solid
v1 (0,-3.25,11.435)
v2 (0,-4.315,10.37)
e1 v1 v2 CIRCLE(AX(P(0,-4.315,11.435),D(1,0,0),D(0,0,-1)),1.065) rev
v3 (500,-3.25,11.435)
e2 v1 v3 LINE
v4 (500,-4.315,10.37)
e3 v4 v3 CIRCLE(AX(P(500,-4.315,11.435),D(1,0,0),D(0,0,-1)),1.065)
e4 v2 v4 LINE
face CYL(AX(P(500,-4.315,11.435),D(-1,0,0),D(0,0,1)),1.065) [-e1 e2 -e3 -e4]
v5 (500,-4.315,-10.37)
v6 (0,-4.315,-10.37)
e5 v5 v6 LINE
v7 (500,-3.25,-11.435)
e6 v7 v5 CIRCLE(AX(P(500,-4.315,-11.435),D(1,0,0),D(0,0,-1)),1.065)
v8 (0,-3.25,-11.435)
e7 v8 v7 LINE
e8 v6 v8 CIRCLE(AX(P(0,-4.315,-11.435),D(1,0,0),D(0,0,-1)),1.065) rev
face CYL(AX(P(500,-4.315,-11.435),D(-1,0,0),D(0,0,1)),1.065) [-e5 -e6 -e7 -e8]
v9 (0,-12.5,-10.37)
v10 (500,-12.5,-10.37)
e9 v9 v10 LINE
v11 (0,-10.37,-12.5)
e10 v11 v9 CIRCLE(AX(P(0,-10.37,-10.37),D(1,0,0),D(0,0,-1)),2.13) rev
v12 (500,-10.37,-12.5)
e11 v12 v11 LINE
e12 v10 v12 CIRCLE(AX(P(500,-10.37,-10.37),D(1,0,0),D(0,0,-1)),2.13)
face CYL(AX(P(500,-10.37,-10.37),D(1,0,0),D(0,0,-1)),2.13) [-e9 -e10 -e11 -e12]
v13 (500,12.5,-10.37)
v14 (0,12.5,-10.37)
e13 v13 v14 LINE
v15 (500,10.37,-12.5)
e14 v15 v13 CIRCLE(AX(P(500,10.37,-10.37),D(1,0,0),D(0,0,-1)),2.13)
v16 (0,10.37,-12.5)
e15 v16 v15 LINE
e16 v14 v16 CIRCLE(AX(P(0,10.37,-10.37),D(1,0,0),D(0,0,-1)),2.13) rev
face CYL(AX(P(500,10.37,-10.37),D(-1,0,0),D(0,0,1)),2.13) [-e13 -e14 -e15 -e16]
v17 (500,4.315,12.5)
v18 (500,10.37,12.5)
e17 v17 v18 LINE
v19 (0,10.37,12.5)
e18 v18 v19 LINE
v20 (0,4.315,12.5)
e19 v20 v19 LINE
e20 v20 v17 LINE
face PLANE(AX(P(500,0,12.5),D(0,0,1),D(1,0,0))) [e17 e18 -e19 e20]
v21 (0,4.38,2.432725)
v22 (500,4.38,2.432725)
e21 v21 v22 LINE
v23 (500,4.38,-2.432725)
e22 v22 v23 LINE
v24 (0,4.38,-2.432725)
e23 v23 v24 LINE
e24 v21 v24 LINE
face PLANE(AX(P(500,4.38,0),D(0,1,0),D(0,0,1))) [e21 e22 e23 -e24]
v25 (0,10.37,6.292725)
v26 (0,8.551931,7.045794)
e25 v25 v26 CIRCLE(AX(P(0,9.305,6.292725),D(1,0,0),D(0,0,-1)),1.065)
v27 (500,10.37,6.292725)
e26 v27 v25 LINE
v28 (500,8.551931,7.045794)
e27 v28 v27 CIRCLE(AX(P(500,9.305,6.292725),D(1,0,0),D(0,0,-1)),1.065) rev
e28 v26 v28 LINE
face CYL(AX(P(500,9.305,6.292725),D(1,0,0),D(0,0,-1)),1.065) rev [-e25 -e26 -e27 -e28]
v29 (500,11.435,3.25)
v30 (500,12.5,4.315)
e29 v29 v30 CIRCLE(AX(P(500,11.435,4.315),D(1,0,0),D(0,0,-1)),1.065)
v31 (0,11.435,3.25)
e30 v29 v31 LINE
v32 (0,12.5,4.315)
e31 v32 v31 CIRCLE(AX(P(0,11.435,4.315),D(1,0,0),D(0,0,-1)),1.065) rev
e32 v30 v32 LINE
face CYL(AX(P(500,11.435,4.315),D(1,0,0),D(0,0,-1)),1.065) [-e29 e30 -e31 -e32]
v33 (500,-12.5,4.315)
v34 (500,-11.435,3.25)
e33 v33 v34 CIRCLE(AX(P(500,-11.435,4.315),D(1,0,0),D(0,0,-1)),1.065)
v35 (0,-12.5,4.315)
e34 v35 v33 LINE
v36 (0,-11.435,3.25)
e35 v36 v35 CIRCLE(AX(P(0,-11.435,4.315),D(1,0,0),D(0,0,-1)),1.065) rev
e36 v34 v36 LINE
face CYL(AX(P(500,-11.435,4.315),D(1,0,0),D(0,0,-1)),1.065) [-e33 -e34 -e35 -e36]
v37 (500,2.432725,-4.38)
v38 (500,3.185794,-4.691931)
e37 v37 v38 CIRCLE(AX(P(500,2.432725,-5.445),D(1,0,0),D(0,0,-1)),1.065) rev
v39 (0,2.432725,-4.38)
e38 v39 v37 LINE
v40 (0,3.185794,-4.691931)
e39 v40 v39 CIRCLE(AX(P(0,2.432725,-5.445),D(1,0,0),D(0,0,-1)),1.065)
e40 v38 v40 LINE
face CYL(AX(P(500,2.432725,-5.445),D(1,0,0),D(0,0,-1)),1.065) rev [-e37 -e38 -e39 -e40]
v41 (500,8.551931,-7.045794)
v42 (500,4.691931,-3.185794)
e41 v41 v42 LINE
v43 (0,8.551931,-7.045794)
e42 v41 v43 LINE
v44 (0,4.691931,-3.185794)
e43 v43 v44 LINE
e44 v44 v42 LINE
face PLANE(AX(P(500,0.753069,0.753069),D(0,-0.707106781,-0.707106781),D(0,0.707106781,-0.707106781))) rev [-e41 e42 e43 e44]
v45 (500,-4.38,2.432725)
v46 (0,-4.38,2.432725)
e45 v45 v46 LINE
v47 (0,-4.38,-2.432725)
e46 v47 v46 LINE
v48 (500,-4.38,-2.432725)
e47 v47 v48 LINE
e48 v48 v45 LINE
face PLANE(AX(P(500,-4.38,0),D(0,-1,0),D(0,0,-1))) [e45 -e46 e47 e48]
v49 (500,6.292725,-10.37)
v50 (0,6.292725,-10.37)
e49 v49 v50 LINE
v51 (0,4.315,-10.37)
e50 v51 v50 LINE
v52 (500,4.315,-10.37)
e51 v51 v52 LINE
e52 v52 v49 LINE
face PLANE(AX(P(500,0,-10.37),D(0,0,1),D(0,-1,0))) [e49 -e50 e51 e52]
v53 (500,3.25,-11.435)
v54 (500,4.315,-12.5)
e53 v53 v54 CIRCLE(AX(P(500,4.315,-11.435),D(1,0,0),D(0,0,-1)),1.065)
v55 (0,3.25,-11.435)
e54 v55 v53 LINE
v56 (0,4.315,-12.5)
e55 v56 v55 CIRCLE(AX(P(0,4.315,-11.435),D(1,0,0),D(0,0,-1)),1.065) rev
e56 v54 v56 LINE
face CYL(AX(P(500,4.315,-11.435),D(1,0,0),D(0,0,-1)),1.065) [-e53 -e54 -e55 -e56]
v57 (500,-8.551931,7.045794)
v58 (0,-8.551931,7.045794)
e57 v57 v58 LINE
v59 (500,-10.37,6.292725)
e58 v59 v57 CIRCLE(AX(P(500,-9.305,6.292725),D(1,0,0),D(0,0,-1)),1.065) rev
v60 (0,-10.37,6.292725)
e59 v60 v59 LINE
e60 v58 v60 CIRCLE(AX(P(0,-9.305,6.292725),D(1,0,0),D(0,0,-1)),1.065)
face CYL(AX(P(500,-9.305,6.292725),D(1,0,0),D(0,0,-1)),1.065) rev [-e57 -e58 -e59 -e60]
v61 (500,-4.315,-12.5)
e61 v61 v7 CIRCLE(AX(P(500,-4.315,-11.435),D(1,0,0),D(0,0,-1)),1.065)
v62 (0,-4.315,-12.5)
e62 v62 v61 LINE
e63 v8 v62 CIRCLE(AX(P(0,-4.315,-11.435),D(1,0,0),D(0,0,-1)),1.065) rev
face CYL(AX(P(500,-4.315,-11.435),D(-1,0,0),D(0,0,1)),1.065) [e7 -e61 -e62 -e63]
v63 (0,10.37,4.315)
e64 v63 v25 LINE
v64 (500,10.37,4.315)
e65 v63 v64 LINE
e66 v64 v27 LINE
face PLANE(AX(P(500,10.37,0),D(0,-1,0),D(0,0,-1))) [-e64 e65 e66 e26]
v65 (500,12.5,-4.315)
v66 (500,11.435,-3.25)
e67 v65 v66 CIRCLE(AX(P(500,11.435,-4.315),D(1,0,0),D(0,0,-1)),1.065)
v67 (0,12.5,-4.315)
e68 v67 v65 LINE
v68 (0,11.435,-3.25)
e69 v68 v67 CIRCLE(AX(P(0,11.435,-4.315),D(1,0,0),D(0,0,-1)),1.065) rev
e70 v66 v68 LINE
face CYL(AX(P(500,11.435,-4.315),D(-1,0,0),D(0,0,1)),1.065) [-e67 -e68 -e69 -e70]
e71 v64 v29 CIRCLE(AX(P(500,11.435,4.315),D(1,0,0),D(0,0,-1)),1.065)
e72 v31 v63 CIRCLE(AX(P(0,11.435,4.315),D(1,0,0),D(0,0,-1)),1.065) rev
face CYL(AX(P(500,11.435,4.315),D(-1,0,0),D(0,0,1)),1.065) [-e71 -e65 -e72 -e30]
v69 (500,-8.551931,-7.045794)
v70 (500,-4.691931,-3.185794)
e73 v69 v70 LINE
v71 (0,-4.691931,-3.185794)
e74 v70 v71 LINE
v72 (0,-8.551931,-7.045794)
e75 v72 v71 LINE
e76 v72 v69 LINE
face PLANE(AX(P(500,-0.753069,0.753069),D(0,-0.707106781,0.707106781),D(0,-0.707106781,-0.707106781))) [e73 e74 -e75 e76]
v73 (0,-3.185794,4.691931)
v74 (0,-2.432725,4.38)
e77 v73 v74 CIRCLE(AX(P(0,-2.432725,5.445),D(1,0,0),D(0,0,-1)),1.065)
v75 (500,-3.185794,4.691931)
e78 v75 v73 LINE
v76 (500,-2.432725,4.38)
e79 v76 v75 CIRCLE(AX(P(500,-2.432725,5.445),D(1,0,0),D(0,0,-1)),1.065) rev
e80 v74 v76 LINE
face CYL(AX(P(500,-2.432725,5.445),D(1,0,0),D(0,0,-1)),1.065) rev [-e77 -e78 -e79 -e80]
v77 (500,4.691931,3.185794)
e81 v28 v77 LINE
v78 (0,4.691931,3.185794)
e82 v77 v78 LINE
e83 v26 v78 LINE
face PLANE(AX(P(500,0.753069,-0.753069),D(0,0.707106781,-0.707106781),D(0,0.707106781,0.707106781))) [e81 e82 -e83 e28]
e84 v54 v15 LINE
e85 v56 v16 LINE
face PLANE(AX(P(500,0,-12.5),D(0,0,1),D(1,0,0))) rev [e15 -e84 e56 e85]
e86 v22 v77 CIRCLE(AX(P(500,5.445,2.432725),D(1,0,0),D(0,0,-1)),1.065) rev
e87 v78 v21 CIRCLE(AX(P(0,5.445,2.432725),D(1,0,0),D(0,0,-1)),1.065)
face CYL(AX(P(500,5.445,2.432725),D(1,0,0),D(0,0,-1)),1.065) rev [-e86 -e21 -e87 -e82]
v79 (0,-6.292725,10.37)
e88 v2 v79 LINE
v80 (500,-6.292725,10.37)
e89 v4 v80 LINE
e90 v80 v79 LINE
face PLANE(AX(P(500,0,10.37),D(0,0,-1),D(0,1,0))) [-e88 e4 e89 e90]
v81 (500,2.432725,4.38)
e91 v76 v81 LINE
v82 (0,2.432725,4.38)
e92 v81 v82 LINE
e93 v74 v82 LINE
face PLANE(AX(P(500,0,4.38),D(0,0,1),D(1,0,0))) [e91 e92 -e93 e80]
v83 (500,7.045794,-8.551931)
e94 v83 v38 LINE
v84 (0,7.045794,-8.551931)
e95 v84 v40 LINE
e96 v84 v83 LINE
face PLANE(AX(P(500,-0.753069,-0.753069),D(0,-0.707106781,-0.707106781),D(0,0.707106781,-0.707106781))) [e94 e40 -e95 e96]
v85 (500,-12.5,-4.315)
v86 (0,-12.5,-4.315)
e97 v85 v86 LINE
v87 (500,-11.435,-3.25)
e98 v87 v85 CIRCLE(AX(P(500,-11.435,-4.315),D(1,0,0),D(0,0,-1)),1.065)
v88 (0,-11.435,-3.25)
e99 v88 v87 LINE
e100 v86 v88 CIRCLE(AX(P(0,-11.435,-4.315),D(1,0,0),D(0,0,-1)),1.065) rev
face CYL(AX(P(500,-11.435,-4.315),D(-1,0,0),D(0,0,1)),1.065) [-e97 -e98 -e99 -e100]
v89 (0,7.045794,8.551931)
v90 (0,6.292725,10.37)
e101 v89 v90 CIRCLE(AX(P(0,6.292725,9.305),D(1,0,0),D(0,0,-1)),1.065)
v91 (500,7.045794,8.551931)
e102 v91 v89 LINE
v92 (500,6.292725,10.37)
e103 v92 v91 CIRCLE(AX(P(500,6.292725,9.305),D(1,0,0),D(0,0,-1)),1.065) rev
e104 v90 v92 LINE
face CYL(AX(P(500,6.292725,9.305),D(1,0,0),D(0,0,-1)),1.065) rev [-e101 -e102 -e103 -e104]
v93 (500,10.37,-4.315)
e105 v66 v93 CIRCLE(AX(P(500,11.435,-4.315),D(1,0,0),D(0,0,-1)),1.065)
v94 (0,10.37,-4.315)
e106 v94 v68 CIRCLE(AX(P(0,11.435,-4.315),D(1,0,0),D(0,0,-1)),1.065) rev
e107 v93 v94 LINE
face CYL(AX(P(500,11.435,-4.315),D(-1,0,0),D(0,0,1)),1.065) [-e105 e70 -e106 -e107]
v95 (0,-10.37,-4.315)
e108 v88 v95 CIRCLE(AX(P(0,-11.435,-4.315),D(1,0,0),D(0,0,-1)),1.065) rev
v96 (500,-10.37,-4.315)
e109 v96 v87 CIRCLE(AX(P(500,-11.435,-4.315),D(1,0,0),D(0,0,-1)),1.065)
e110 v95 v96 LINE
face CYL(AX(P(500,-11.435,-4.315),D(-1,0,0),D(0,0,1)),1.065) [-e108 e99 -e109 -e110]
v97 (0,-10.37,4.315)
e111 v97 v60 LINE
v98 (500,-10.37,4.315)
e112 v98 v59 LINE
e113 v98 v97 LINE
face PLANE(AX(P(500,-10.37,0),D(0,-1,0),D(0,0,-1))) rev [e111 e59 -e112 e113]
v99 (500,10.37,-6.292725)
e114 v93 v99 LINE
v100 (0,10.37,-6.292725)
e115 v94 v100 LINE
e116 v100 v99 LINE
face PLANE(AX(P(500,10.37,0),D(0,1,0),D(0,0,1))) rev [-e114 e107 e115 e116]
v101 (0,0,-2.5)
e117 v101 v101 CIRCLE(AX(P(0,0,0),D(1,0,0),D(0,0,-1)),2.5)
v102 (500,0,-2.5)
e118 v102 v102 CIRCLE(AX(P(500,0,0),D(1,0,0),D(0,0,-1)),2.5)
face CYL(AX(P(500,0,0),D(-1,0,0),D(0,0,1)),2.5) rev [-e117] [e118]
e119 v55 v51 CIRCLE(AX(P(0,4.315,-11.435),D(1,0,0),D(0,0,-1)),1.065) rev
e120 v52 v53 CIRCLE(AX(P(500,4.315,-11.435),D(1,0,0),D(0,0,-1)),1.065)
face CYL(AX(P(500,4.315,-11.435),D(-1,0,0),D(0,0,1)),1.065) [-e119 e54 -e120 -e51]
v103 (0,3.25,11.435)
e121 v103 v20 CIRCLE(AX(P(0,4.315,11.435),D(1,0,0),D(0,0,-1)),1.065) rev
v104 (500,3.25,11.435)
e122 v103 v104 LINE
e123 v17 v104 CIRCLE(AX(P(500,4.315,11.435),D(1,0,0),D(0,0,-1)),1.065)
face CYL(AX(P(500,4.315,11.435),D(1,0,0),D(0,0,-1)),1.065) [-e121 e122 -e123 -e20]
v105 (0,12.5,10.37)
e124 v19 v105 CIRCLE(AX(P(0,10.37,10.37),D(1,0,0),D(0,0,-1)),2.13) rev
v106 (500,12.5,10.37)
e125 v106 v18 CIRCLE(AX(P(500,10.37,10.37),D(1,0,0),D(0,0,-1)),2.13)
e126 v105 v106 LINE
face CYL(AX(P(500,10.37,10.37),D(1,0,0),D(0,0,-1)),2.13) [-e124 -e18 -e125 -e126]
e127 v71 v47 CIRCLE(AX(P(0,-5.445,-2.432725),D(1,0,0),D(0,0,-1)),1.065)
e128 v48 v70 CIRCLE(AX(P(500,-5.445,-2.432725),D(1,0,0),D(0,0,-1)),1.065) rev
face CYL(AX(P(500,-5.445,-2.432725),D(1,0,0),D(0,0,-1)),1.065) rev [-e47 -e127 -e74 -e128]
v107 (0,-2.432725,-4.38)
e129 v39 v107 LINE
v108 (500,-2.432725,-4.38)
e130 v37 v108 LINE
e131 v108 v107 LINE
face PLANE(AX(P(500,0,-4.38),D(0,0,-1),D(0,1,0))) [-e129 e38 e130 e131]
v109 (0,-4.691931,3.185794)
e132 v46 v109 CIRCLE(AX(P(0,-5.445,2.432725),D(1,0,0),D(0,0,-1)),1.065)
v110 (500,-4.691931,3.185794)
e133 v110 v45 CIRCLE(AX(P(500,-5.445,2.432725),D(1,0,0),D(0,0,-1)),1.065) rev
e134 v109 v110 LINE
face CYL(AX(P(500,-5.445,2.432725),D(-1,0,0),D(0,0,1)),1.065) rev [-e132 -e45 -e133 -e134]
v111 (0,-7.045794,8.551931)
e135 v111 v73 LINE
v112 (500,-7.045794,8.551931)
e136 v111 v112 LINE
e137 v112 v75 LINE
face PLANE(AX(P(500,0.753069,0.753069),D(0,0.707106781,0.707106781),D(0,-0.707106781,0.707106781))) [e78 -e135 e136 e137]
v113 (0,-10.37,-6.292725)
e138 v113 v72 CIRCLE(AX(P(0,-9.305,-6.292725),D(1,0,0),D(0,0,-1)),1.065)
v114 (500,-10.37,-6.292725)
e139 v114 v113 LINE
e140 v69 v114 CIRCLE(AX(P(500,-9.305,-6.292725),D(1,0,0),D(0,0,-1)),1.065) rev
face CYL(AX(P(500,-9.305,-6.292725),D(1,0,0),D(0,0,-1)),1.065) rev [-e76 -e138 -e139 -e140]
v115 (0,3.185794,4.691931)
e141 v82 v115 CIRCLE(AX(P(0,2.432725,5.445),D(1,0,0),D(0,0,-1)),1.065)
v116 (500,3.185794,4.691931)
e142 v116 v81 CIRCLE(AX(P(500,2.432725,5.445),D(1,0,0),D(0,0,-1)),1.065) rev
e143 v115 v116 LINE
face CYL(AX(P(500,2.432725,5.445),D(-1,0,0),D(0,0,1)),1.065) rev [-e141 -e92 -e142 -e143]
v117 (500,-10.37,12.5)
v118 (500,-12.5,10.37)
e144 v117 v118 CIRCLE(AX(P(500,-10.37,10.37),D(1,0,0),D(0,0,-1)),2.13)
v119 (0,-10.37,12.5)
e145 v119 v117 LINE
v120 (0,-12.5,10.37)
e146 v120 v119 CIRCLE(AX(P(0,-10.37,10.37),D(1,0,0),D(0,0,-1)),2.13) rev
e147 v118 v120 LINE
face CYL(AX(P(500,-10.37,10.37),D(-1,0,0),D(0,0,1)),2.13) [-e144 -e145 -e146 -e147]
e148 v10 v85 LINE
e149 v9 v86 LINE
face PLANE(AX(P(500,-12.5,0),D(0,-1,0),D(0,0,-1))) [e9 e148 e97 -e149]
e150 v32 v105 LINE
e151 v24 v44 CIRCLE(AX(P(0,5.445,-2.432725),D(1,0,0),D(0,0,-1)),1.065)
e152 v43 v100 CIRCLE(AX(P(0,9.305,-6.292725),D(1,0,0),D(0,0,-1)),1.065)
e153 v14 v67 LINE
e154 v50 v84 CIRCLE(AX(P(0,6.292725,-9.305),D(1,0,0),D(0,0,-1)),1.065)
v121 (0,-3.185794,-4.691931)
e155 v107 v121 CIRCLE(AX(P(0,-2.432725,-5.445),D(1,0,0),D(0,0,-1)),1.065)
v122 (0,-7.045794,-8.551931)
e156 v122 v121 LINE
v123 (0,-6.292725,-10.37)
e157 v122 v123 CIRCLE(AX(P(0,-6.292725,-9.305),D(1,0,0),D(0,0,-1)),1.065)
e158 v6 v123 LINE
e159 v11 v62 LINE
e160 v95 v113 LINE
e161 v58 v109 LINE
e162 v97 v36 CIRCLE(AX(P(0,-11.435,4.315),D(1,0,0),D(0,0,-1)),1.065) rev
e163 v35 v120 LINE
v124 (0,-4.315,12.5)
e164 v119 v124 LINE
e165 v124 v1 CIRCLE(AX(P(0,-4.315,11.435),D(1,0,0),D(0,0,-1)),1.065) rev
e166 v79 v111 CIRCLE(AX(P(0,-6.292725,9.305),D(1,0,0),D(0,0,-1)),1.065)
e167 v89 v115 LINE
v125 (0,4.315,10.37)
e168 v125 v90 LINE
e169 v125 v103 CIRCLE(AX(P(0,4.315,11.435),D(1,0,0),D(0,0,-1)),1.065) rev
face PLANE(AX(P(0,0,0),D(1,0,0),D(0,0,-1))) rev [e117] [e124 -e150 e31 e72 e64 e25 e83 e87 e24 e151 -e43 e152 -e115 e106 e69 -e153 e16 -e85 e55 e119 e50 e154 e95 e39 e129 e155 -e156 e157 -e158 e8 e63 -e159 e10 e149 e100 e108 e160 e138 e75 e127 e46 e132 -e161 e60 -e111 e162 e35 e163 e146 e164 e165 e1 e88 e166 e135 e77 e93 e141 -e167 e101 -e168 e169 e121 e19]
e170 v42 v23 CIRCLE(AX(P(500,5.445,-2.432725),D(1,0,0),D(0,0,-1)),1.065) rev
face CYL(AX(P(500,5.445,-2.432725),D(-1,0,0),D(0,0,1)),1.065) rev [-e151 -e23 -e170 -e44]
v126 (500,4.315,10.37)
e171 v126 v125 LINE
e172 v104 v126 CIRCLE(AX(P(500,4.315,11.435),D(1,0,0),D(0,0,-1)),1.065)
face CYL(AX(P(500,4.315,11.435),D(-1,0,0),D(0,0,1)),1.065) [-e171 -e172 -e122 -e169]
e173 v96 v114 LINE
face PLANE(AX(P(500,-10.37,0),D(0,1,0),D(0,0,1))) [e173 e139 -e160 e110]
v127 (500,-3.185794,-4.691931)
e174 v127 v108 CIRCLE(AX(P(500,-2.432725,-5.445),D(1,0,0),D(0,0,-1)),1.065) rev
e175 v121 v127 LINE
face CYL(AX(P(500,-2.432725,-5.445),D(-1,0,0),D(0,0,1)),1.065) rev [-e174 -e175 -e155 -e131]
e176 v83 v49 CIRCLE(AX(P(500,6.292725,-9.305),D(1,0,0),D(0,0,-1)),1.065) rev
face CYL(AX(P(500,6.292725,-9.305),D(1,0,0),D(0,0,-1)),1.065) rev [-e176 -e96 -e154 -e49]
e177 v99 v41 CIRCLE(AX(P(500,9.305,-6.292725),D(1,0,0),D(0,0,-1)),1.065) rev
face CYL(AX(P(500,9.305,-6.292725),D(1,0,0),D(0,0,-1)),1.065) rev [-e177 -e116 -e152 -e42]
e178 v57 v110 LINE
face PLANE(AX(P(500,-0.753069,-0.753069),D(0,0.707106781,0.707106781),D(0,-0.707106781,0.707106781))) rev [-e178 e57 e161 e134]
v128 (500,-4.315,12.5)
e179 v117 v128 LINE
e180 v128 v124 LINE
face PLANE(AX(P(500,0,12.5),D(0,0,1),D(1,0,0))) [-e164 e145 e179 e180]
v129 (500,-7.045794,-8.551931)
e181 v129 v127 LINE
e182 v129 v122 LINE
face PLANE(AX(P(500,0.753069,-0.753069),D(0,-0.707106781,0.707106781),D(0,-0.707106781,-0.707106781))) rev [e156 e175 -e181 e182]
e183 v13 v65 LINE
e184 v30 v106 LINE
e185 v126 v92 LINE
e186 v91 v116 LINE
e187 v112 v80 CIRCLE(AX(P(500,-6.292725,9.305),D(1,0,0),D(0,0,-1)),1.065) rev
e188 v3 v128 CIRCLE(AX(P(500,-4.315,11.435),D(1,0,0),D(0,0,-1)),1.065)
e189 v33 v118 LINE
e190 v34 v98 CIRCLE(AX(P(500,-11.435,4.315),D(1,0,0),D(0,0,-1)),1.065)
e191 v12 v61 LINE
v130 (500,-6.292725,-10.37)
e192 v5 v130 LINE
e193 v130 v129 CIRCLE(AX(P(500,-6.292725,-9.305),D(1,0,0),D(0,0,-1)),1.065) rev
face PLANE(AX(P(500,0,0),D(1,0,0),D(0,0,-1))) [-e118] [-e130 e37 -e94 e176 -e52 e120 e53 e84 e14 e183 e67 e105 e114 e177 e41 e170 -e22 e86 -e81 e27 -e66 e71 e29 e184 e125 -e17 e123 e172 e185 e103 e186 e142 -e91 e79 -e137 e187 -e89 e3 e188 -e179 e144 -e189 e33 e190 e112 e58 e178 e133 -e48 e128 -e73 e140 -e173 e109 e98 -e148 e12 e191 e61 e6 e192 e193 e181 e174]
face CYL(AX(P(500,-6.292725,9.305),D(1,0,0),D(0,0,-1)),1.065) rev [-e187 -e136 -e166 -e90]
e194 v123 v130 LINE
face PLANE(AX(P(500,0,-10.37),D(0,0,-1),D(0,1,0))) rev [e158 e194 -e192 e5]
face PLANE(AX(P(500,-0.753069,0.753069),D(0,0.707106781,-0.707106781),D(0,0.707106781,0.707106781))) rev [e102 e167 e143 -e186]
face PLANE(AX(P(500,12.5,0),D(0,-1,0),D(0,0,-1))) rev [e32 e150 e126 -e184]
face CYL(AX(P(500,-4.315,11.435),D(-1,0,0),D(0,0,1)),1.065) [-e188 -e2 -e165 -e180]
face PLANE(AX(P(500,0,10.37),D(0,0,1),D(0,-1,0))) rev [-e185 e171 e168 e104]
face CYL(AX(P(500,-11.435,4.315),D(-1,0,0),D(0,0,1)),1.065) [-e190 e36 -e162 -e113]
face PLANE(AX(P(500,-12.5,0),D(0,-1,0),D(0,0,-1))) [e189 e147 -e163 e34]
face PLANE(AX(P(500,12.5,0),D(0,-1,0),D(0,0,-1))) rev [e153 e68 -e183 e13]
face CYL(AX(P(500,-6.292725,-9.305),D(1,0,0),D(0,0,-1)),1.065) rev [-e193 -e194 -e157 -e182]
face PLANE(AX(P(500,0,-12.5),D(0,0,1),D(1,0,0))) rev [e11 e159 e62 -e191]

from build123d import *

# Parameters (mm, degrees)
SKETCH1_R           = 2.5
BOSS_EXTRUDE1_DEPTH = 500
FILLET1_R           = 1.065
FILLET2_R           = 2.13


with BuildPart() as part:
    # Sketch1 → Boss-Extrude1 (new body)
    with BuildSketch(Plane.YZ):
        Polygon((-12.5, -3.25), (-12.5, -12.5), (-3.25, -12.5), (-3.25, -10.37), (-8.863862556, -10.37), (-2.873862556, -4.38), (2.873862556, -4.38), (8.863862556, -10.37), (3.25, -10.37), (3.25, -12.5), (12.5, -12.5), (12.5, -3.25), (10.37, -3.25), (10.37, -8.863862556), (4.38, -2.873862556), (4.38, 2.873862556), (10.37, 8.863862556), (10.37, 3.25), (12.5, 3.25), (12.5, 12.5), (3.25, 12.5), (3.25, 10.37), (8.863862556, 10.37), (2.873862556, 4.38), (-2.873862556, 4.38), (-8.863862556, 10.37), (-3.25, 10.37), (-3.25, 12.5), (-12.5, 12.5), (-12.5, 3.25), (-10.37, 3.25), (-10.37, 8.863862556), (-4.38, 2.873862556), (-4.38, -2.873862556), (-10.37, -8.863862556), (-10.37, -3.25), align=None)
        with Locations(Location((0, 0, 0), (0, 0, 270))):
            Circle(SKETCH1_R, mode=Mode.SUBTRACT)
    extrude(amount=BOSS_EXTRUDE1_DEPTH)

    # Fillet1
    fillet1_edges = [part.edges().sort_by_distance(p)[0] for p in [
        (250, -10.37, -8.863862556),
        (250, 2.873862556, -4.38),
        (250, -2.873862556, -4.38),
        (250, -4.38, 2.873862556),
        (250, -4.38, -2.873862556),
        (250, -2.873862556, 4.38),
        (250, 2.873862556, 4.38),
        (250, 4.38, 2.873862556),
        (250, 4.38, -2.873862556),
        (250, -8.863862556, -10.37),
        (250, 8.863862556, -10.37),
        (250, 10.37, -8.863862556),
        (250, -10.37, 8.863862556),
        (250, -8.863862556, 10.37),
        (250, 10.37, 8.863862556),
        (250, 8.863862556, 10.37),
        (250, 12.5, 3.25),
        (250, -3.25, -12.5),
        (250, -10.37, 3.25),
        (250, 10.37, 3.25),
        (250, -10.37, -3.25),
        (250, -12.5, -3.25),
        (250, -12.5, 3.25),
        (250, 3.25, -10.37),
        (250, -3.25, -10.37),
        (250, 3.25, -12.5),
        (250, 10.37, -3.25),
        (250, 12.5, -3.25),
        (250, 3.25, 12.5),
        (250, 3.25, 10.37),
        (250, -3.25, 10.37),
        (250, -3.25, 12.5),
    ]]
    fillet(fillet1_edges, radius=FILLET1_R - 0.0001)  # a hair under: the kernel refuses the full size

    # Fillet2
    fillet2_edges = [part.edges().sort_by_distance(p)[0] for p in [
        (250, -12.5, 12.5),
        (250, 12.5, 12.5),
        (250, 12.5, -12.5),
        (250, -12.5, -12.5),
    ]]
    fillet(fillet2_edges, radius=FILLET2_R)


solid = part.part
